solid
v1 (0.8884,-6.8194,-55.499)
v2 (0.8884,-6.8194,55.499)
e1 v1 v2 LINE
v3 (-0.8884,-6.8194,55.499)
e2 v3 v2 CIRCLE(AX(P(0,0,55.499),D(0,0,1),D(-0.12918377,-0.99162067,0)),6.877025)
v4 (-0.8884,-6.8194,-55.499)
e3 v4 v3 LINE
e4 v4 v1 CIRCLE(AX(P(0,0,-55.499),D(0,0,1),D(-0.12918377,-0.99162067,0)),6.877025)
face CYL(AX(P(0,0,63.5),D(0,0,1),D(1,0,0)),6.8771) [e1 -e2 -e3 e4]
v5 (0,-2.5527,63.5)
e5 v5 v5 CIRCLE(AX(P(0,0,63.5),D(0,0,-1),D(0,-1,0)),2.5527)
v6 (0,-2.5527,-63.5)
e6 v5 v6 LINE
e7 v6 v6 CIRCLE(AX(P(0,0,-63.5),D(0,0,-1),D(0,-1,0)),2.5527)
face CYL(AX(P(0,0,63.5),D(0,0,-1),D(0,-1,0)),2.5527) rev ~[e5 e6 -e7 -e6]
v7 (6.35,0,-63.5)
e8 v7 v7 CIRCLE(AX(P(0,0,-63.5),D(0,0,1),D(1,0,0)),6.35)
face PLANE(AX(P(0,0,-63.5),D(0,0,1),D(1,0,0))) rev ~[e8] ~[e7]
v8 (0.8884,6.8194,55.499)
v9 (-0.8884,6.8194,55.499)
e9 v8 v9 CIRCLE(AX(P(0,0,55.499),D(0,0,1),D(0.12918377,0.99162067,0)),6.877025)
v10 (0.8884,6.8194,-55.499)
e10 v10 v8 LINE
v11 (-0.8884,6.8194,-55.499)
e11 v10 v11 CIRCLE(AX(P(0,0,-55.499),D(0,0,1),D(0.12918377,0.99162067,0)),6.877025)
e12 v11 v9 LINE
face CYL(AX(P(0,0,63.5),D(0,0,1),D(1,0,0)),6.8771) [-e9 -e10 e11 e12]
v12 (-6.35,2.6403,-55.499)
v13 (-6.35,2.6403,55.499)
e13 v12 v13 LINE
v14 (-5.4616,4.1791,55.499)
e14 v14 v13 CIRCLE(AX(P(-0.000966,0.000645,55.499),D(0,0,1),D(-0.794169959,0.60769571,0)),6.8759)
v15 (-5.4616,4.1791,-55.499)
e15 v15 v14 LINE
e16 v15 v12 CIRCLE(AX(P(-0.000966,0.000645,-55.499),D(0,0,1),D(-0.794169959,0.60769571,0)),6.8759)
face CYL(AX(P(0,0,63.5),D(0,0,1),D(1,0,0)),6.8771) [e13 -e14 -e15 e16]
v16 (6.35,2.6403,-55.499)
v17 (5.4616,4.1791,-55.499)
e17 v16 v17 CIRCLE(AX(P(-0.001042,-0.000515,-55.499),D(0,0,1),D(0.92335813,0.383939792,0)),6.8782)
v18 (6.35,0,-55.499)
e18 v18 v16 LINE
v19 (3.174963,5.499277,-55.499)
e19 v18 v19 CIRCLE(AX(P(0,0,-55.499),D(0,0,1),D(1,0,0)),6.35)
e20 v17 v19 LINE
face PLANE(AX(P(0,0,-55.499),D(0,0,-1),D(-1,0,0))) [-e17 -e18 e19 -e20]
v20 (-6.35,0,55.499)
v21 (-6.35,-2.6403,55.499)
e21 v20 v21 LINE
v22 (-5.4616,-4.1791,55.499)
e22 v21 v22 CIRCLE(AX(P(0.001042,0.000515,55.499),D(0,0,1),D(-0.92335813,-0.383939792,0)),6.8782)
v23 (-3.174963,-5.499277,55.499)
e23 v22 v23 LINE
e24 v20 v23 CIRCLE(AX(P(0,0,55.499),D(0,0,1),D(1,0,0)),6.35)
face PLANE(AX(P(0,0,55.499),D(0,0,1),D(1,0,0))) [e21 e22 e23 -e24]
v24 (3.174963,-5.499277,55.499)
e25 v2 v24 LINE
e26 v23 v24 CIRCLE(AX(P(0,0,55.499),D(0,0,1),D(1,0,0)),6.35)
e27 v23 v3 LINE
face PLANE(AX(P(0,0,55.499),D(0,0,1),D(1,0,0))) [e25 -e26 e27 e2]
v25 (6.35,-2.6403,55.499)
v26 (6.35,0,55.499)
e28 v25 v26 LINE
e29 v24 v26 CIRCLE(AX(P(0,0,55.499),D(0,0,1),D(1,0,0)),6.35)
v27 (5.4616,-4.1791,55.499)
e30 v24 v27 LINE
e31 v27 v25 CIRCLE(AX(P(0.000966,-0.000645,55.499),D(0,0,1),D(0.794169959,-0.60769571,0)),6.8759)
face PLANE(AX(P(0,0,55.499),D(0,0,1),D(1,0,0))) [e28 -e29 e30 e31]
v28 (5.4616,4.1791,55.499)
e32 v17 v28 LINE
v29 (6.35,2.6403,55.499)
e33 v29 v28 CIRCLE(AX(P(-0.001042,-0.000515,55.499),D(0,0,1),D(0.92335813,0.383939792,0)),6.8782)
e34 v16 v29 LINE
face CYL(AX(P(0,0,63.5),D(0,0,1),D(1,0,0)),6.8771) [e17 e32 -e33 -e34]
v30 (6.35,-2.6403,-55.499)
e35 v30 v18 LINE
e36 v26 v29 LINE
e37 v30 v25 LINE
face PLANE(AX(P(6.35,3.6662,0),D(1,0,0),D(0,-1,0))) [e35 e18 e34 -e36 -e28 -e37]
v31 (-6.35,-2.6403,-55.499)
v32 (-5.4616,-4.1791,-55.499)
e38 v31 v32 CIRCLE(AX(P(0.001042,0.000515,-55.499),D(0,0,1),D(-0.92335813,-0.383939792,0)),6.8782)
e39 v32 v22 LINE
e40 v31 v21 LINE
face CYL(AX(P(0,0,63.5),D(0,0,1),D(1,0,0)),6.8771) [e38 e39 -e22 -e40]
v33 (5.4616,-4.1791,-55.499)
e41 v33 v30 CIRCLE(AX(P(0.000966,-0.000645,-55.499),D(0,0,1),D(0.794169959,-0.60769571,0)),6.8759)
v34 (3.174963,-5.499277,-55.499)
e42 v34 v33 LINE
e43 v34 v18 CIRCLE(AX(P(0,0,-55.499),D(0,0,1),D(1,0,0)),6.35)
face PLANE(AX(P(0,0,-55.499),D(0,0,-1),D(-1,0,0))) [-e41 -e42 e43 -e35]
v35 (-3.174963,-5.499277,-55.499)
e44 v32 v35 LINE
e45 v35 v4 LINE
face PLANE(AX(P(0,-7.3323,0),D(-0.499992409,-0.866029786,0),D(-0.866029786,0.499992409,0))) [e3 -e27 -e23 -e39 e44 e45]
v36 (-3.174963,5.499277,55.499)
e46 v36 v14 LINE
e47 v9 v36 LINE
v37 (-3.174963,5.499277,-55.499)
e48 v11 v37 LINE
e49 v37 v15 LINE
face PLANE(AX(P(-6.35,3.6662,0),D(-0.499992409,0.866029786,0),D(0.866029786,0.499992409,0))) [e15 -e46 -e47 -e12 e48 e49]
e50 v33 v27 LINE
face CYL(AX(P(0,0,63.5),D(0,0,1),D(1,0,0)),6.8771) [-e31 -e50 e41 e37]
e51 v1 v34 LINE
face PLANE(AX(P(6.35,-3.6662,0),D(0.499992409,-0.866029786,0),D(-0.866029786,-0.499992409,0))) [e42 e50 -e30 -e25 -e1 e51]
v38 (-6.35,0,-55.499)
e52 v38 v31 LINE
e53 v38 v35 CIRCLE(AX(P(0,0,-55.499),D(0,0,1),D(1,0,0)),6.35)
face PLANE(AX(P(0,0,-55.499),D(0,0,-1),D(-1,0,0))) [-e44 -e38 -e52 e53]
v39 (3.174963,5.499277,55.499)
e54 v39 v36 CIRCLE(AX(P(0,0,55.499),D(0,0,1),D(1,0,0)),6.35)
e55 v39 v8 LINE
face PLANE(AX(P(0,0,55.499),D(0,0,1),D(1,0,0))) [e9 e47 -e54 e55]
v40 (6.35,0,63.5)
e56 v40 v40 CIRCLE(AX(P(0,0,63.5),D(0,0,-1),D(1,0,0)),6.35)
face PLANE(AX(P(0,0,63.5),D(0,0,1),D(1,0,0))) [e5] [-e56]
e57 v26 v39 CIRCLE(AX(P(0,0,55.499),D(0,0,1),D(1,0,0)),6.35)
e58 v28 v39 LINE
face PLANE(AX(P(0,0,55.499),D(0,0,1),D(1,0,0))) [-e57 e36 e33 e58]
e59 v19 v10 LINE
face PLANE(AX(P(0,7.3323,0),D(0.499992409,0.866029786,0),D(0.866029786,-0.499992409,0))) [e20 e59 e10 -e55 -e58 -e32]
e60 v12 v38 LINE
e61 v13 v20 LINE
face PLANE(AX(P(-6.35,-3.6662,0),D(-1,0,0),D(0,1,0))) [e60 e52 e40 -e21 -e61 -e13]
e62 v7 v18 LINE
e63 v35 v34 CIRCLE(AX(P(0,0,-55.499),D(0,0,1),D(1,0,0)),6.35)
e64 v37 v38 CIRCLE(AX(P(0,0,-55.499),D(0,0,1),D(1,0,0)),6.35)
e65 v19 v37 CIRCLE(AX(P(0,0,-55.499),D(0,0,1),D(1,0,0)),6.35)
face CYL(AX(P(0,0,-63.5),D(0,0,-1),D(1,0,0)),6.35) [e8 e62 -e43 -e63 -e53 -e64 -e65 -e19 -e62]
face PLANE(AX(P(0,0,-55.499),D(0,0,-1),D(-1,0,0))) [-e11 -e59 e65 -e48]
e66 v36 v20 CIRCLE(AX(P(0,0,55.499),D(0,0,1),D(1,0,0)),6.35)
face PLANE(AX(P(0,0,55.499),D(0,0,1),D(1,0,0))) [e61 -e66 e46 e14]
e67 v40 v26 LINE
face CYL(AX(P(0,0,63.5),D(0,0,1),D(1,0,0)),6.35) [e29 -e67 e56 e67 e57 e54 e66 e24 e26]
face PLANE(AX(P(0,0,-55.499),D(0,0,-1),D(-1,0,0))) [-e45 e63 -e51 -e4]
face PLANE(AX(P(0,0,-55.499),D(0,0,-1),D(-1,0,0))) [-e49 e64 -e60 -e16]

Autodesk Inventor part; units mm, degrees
ref_plane "YZ Plane" through (0, 0, 0) normal (1, 0, 0) x (0, 1, 0)
ref_plane "XZ Plane" through (0, 0, 0) normal (0, 1, 0) x (-1, 0, 0)
ref_plane "XY Plane" through (0, 0, 0) normal (0, 0, 1) x (1, 0, 0)
sketch "Sketch1" plane through (0, 0, 0) normal (0, 0, 1) x (1, 0, 0)
  line L0 (-6.35, -3.6662) -> (-6.35, 3.6662)
  line L1 (-6.35, 3.6662) -> (0, 7.3323)
  line L2 (0, 7.3323) -> (6.35, 3.6662)
  line L3 (6.35, 3.6662) -> (6.35, -3.6662)
  line L4 (6.35, -3.6662) -> (0, -7.3323)
  line L5 (0, -7.3323) -> (-6.35, -3.6662)
  point P0 (0, 0)
  point P1 (0, 0)
  dimension "Size" = 12.7
extrude "Extrusion1" add sketch "Sketch1" along normal mid plane 127
sketch "Sketch3" plane through (0, 0, 63.5) normal (0, 0, 1) x (1, 0, 0)
  line L0 (-6.35, 3.6662) -> (0, 7.3323) construction
  line L1 (0, 7.3323) -> (6.35, 3.6662) construction
  line L2 (6.35, 3.6662) -> (6.35, -3.6662) construction
  line L3 (6.35, -3.6662) -> (0, -7.3323) construction
  line L4 (0, -7.3323) -> (-6.35, -3.6662) construction
  line L5 (-6.35, -3.6662) -> (-6.35, 3.6662) construction
  point P0 (0, 0)
hole "Hole1" at (0, 0, 63.5) direction (0, 0, -1) diameter 5.1054 end through all
sketch "Sketch4" plane through (0, 0, 63.5) normal (0, 0, 1) x (1, 0, 0)
  circle A0 centre (0, 0) radius 2.5527 construction
  line L0 (-6.35, 3.6662) -> (0, 7.3323) construction
  line L1 (0, 7.3323) -> (6.35, 3.6662) construction
  line L2 (6.35, 3.6662) -> (6.35, -3.6662) construction
  line L3 (6.35, -3.6662) -> (0, -7.3323) construction
  line L4 (0, -7.3323) -> (-6.35, -3.6662) construction
  line L5 (-6.35, -3.6662) -> (-6.35, 3.6662) construction
  circle A1 centre (0, 0) radius 6.8771
  circle A2 centre (0, 0) radius 8.89
  dimension "thunder" = 13.7541
  dimension "d16" = 17.78
extrude "Extrusion3" cut sketch "Sketch4" against normal through all
sketch "Sketch5" plane through (0, 0, 63.5) normal (0, 0, 1) x (1, 0, 0)
  arc A0 (5.4616, -4.1791) -> (6.35, -2.6403) centre (0, 0) ccw projected
  line L0 (6.35, -2.6403) -> (6.35, 2.6403) projected
  arc A1 (6.35, 2.6403) -> (5.4616, 4.1791) centre (0, 0) ccw projected
  line L1 (5.4616, 4.1791) -> (0.8884, 6.8194) projected
  arc A2 (0.8884, 6.8194) -> (-0.8884, 6.8194) centre (0, 0) ccw projected
  line L2 (-0.8884, 6.8194) -> (-5.4616, 4.1791) projected
  arc A3 (-5.4616, 4.1791) -> (-6.35, 2.6403) centre (0, 0) ccw projected
  line L3 (-6.35, 2.6403) -> (-6.35, -2.6403) projected
  arc A4 (-6.35, -2.6403) -> (-5.4616, -4.1791) centre (0, 0) ccw projected
  line L4 (-5.4616, -4.1791) -> (-0.8884, -6.8194) projected
  arc A5 (-0.8884, -6.8194) -> (0.8884, -6.8194) centre (0, 0) ccw projected
  line L5 (0.8884, -6.8194) -> (5.4616, -4.1791) projected
  circle A6 centre (0, 0) radius 2.5527 projected
  circle A7 centre (0, 0) radius 6.35
  point P0 (3.175, -5.4993)
  point P1 (-3.175, -5.4993)
  point P2 (-6.35, 0)
  point P3 (-3.175, 5.4993)
  point P4 (3.175, 5.4993)
  point P5 (6.35, 0)
  dimension "d19" = 12.7
extrude "Extrusion4" cut sketch "Sketch5" against normal blind 8.001 contours L5 A7 L0 A0 | L5 A5 L4 A7 | A7 L1 A1 L0 | L4 A4 L3 A7 | A7 L2 A2 L1 | L3 A3 L2 A7
mirror "Mirror2" about plane through (0, 0, 0) normal (0, 0, 1) of "Extrusion4"
equation "\"bearing\" = 25.4"
properties part number "GP3-002" material "Aluminum 6061"
